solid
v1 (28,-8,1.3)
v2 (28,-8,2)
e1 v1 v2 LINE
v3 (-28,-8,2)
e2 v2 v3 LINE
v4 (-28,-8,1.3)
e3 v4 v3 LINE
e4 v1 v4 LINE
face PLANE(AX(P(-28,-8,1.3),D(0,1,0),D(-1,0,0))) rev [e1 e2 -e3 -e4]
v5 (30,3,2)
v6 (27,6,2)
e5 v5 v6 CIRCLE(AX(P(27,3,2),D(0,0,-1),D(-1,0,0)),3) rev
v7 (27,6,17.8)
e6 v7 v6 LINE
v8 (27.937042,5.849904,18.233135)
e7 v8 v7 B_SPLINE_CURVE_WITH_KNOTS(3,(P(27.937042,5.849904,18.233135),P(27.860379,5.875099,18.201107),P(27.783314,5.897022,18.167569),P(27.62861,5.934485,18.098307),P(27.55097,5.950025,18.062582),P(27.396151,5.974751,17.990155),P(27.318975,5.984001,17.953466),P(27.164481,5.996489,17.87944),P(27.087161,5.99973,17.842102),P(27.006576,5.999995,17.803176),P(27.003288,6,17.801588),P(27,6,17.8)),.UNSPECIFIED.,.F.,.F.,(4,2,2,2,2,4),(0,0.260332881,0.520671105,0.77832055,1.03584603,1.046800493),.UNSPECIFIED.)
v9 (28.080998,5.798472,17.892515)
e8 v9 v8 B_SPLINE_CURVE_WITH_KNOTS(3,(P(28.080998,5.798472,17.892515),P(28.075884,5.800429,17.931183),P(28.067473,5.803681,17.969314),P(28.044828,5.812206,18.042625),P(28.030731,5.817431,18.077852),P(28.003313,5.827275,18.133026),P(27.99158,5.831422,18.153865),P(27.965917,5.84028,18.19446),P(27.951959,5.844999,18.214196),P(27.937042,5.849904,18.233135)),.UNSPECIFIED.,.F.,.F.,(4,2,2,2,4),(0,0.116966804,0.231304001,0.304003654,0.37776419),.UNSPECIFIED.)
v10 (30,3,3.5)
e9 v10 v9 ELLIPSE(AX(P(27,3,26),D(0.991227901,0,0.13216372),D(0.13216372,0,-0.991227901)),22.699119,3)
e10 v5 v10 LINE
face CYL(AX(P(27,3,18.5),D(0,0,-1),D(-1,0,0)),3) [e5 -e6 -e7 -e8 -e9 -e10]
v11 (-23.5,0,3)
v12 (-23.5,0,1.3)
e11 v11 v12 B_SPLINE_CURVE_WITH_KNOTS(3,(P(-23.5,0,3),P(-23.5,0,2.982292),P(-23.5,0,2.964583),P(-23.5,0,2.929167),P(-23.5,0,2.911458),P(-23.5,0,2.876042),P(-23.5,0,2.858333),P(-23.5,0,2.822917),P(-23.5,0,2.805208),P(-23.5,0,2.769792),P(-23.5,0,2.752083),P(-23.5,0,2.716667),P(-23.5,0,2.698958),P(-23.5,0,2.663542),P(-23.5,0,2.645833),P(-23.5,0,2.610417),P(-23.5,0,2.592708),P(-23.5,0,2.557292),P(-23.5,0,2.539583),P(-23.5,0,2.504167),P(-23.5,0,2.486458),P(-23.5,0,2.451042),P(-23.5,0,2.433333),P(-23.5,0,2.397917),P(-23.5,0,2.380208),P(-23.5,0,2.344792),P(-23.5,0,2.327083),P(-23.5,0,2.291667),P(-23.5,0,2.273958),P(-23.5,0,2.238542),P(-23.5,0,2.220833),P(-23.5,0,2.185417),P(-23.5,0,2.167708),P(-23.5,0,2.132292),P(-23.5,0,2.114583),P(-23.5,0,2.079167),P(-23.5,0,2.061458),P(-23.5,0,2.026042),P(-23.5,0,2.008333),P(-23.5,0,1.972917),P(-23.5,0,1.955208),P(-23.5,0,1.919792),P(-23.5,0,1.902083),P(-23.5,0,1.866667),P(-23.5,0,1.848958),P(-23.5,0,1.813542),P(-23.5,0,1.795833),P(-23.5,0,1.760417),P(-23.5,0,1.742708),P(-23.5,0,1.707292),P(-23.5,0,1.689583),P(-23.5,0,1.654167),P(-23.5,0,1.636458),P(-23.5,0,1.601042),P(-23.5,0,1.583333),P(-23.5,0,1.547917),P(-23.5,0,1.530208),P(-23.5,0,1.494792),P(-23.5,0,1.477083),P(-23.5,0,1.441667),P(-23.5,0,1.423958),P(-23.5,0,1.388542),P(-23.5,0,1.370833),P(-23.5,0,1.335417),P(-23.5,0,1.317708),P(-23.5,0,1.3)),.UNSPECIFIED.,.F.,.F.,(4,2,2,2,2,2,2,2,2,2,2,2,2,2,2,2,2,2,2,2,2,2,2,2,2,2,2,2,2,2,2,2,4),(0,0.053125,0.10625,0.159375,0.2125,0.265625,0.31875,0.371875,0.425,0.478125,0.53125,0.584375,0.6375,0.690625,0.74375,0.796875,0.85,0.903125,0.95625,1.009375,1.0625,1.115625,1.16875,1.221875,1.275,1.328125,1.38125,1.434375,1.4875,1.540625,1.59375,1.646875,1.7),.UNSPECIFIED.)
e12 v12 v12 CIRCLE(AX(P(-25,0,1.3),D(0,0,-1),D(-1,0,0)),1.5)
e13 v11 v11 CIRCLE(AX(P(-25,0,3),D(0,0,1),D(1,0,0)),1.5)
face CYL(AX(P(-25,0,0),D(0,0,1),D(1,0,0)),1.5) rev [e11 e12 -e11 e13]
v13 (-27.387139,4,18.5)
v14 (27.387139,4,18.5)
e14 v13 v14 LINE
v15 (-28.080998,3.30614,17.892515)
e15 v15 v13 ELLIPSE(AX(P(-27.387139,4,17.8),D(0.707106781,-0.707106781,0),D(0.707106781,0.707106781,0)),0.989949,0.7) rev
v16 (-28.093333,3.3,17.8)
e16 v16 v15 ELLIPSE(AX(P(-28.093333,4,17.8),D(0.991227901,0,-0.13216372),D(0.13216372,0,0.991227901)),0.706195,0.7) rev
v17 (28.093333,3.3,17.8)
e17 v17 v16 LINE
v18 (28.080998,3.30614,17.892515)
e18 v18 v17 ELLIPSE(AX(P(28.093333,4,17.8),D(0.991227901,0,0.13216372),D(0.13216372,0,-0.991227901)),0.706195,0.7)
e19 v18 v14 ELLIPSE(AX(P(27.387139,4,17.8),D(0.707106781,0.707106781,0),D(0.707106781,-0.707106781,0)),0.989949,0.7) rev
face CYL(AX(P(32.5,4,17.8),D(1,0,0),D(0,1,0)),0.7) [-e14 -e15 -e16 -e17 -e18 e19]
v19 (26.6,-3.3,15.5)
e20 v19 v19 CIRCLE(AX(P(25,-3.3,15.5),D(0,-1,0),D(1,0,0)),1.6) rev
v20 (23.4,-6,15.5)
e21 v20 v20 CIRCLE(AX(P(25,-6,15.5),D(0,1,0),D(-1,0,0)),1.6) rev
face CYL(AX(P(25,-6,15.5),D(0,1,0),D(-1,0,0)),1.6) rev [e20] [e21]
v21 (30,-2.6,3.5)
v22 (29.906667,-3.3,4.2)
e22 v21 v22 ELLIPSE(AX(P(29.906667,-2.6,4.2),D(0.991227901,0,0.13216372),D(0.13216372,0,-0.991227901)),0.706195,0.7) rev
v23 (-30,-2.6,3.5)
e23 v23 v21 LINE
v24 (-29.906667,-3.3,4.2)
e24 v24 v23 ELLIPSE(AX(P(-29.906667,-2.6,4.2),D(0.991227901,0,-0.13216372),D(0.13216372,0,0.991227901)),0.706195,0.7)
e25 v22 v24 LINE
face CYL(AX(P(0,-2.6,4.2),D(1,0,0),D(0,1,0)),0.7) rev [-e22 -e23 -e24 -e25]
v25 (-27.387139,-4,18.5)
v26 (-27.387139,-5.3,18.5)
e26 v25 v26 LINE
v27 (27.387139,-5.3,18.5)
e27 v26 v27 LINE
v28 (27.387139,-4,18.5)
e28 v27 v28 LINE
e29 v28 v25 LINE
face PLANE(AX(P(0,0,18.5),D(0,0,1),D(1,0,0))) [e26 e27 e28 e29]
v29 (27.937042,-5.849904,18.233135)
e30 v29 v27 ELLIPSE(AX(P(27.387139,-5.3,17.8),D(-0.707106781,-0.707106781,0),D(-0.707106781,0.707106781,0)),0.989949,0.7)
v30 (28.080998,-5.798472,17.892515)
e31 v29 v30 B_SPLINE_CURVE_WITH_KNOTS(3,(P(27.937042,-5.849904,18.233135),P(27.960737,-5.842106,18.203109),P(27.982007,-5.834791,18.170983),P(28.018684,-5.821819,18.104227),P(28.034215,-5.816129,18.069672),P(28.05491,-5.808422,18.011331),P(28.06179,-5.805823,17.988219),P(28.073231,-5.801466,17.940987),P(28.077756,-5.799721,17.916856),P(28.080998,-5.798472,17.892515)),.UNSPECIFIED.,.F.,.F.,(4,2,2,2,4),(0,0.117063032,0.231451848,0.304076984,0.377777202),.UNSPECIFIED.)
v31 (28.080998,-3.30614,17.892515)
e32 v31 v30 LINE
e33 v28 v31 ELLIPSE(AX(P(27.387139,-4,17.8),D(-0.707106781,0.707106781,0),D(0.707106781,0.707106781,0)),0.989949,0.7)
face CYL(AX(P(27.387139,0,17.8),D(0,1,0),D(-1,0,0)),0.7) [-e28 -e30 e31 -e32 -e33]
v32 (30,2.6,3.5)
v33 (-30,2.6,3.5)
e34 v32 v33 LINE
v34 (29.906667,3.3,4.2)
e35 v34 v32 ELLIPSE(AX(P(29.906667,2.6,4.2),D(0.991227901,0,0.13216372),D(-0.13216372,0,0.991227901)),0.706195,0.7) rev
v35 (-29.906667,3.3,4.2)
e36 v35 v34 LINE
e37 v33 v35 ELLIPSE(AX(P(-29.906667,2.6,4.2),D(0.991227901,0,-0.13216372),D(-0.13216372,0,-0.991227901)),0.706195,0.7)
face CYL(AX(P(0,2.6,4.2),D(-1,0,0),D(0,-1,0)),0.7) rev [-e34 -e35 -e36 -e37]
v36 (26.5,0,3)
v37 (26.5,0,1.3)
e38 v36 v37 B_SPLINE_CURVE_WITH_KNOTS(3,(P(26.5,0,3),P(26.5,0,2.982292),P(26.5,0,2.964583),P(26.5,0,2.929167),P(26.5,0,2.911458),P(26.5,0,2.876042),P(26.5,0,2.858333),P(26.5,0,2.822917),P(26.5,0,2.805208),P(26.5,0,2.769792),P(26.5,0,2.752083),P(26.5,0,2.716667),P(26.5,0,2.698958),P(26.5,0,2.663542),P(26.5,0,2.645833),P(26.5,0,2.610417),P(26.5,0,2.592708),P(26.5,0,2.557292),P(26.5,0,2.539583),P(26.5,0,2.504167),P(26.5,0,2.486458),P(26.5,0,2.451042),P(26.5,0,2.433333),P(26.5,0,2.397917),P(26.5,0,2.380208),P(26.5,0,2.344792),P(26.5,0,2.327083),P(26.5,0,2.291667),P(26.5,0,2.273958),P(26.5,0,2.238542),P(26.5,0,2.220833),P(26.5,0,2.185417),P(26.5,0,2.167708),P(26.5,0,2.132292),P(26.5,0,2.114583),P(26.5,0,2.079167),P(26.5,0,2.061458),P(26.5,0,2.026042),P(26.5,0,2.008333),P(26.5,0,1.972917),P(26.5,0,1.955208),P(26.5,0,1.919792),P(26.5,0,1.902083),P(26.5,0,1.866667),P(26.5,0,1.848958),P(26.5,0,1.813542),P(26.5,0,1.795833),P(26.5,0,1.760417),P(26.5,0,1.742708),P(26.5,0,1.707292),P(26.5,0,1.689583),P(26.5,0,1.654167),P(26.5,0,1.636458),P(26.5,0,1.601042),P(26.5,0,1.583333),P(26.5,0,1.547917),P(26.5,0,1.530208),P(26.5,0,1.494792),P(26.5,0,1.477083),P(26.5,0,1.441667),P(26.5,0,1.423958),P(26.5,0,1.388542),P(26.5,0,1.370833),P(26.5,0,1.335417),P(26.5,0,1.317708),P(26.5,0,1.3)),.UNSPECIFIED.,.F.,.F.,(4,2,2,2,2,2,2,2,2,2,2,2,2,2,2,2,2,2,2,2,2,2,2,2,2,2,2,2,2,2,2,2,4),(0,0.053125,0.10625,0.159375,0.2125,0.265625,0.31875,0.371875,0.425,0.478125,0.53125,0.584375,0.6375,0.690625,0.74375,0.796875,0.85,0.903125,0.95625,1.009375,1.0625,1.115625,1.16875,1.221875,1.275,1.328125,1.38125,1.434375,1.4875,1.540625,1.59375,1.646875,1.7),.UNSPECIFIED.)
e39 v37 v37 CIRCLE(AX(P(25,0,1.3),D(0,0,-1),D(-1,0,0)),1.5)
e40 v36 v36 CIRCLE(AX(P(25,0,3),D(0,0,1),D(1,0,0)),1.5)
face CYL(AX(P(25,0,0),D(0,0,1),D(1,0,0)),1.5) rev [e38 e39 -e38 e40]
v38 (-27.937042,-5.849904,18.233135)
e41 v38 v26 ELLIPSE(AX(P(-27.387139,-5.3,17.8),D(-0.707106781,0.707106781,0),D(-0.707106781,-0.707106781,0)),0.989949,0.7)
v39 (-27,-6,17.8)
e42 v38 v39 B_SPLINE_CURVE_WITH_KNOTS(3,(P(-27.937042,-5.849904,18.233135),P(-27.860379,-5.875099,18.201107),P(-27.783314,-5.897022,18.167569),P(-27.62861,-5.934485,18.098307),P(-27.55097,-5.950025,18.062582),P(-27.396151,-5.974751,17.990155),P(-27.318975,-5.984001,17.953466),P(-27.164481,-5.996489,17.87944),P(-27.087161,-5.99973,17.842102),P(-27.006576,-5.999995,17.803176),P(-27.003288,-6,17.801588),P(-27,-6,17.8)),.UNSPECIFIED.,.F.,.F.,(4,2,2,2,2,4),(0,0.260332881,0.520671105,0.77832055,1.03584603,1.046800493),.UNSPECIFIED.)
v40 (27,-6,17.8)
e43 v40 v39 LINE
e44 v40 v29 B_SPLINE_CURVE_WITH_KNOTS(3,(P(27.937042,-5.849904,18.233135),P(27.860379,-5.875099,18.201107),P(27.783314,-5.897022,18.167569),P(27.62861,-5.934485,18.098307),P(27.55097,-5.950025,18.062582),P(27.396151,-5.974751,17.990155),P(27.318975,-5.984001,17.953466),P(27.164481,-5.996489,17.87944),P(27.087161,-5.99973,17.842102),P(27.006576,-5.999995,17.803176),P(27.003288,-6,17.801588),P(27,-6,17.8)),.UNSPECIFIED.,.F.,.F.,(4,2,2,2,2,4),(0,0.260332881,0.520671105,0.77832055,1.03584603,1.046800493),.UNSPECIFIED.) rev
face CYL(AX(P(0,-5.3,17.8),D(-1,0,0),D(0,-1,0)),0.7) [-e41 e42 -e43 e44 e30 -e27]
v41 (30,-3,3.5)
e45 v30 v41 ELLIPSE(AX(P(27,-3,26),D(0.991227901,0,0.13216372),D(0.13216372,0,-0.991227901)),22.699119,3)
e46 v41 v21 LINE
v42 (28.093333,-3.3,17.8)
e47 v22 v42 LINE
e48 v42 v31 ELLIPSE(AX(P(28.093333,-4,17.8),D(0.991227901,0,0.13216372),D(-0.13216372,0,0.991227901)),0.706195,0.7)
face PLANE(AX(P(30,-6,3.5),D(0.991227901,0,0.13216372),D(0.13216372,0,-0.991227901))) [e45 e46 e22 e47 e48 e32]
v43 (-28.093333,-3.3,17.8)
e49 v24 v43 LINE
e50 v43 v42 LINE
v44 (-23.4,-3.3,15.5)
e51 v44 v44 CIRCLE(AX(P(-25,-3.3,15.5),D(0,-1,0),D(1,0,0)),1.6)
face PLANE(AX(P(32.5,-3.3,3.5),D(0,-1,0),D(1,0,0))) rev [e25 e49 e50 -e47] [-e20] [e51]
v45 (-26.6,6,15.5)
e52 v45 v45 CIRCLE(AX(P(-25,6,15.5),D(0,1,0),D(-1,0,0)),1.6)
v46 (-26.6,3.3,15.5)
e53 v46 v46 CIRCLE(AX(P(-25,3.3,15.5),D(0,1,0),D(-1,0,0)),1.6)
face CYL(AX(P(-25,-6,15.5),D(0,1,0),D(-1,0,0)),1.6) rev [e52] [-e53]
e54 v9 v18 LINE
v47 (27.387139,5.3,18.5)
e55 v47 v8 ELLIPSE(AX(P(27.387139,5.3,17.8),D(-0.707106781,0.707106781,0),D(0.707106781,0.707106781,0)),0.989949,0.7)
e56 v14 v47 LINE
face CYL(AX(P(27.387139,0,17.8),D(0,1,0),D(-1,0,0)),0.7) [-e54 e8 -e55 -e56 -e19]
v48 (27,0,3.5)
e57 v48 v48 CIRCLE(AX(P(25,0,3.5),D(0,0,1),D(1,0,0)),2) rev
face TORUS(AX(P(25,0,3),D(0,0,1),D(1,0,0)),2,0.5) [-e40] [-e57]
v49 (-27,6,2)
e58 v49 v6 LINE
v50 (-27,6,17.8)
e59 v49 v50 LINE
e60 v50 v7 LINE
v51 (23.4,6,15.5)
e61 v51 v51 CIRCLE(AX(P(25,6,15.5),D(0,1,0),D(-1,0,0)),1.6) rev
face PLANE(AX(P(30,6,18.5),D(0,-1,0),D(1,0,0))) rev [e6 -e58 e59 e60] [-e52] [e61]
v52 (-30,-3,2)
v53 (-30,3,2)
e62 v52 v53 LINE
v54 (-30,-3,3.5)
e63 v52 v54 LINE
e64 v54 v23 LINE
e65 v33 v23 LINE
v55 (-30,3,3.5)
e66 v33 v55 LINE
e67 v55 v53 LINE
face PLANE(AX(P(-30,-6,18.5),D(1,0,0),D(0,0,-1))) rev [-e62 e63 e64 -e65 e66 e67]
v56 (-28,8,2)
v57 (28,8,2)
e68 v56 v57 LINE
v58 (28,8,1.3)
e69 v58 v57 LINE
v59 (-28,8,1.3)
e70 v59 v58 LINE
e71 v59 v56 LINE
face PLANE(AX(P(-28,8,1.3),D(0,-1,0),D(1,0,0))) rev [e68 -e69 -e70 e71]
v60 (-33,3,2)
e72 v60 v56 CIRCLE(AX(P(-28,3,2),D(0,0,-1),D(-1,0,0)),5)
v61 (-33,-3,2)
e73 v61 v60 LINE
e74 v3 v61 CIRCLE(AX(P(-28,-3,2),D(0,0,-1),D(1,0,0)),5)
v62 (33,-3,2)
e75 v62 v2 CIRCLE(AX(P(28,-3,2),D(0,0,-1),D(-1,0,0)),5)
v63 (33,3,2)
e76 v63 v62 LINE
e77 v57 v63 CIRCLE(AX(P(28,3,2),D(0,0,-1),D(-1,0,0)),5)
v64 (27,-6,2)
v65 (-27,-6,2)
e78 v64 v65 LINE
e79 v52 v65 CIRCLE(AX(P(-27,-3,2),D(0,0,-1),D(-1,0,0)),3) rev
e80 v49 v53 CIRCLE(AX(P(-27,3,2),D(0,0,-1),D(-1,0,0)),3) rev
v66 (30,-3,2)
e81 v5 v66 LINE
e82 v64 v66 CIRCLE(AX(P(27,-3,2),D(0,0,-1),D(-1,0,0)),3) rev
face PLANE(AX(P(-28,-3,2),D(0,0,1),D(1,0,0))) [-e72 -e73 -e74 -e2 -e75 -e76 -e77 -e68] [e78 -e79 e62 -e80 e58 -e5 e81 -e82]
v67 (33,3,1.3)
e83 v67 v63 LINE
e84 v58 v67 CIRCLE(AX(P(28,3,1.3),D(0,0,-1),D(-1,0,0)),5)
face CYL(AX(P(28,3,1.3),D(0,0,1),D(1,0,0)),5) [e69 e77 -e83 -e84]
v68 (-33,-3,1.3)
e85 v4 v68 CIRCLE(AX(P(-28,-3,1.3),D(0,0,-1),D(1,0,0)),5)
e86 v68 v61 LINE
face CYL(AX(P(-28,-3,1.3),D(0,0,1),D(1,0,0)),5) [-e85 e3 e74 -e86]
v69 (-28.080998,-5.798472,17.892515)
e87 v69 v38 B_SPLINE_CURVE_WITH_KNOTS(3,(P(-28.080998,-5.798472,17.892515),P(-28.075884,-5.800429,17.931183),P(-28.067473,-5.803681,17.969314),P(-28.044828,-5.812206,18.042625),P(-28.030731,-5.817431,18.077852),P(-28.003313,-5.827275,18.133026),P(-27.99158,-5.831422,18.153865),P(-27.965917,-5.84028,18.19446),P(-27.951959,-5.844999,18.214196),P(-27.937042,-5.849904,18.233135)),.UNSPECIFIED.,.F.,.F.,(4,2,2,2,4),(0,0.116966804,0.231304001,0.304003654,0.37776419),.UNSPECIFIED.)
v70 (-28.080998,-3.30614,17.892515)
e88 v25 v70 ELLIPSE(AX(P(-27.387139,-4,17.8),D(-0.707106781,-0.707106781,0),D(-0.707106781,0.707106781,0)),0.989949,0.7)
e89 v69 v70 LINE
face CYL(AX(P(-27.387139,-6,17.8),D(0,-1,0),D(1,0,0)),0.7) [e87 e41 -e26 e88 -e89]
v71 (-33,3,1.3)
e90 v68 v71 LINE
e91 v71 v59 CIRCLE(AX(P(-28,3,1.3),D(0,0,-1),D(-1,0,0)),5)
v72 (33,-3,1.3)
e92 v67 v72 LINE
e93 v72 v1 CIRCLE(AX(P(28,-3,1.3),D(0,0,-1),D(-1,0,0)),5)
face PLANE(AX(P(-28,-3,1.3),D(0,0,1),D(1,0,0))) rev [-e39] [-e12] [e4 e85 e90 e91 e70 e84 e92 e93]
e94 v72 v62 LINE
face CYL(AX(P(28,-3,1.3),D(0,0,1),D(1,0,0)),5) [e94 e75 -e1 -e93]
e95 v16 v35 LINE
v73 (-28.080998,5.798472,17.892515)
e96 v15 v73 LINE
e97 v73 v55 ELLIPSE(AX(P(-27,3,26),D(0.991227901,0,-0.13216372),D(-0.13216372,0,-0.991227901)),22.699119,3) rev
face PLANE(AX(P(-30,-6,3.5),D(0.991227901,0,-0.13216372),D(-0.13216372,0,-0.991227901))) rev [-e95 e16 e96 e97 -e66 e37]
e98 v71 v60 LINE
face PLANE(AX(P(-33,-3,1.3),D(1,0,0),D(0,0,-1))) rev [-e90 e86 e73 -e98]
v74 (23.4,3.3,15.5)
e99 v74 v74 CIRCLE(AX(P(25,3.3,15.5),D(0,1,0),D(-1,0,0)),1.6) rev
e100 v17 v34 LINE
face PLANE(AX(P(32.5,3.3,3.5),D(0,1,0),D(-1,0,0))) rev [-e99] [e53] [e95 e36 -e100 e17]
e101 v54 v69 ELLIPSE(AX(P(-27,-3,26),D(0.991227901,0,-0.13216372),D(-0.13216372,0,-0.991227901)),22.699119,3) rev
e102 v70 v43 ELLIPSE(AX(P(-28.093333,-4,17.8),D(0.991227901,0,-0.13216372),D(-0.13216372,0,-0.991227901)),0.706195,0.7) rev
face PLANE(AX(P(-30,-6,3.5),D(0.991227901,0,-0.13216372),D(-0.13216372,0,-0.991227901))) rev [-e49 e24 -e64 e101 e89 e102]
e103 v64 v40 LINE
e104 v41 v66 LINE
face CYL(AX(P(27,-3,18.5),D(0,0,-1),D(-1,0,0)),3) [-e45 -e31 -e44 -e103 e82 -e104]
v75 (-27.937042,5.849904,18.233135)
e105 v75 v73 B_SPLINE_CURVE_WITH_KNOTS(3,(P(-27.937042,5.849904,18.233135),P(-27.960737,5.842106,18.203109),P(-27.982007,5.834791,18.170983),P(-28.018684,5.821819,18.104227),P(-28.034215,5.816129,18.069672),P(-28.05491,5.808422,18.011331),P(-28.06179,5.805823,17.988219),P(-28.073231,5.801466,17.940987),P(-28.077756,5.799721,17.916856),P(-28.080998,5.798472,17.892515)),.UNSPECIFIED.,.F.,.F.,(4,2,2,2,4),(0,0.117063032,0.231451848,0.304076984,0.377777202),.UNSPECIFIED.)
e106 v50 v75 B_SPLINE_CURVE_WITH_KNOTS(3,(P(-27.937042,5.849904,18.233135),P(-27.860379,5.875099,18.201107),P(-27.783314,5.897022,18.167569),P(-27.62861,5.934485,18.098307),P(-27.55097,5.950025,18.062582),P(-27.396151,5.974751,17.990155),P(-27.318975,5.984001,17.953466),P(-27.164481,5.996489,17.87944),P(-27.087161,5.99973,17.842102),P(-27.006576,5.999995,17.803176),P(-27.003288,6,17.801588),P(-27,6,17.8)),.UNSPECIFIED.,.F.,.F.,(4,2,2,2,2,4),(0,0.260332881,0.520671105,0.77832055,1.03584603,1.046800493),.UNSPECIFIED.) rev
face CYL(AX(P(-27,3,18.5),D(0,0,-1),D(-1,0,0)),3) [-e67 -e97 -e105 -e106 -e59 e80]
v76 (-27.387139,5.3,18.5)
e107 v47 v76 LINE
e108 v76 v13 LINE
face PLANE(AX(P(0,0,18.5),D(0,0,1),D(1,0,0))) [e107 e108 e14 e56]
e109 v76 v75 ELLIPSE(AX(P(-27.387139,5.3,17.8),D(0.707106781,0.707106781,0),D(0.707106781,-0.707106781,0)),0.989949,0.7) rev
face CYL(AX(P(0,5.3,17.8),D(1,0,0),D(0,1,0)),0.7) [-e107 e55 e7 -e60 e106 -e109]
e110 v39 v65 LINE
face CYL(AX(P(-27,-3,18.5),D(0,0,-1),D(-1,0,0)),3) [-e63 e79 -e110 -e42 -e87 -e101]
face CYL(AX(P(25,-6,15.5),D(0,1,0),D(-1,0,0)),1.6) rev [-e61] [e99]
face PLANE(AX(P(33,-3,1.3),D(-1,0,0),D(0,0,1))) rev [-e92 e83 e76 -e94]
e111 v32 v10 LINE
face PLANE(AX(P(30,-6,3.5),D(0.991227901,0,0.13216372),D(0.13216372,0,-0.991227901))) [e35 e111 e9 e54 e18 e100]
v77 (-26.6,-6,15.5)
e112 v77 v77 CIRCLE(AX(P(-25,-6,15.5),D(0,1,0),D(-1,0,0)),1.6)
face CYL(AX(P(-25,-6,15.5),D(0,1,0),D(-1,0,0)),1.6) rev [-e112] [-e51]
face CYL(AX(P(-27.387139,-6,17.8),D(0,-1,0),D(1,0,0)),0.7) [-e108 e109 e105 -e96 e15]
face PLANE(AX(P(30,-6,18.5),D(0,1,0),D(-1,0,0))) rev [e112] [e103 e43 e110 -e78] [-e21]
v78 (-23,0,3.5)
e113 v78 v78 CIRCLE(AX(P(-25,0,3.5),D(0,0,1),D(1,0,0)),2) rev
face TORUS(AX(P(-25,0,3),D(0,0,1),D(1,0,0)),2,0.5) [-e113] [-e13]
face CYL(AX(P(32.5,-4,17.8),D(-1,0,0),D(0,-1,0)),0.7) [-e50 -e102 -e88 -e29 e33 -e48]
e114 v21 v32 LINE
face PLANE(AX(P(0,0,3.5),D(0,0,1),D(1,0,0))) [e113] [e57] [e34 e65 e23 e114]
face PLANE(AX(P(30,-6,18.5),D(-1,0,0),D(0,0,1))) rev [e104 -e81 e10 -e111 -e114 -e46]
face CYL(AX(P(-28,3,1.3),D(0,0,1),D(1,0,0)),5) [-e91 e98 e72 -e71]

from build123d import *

# Parameters (mm, degrees)
SKETCH1_W           = 60
SKETCH1_H           = 12
BOSS_EXTRUDE1_DEPTH = 18.5
SKETCH2_W           = 65
SKETCH2_H           = 6.6
CUT_EXTRUDE1_DEPTH  = 15
SKETCH3_R           = 1.6
CUT_EXTRUDE2_DEPTH  = 38.232378382
CUT_EXTRUDE3_DEPTH  = 37.451886097
FILLET1_R           = 0.7
FILLET3_R           = 0.7
FILLET4_R           = 3
SKETCH5_R           = 1.5
CUT_EXTRUDE4_DEPTH  = 35.073450224
FILLET5_R           = 0.5
SKETCH6_W           = 73.746826028
SKETCH6_H           = 28.597179554
CUT_EXTRUDE5_DEPTH  = 2
SKETCH8_R           = 1.5
BOSS_EXTRUDE2_DEPTH = 0.7


with BuildPart() as part:
    # Sketch1 → Boss-Extrude1 (new body)
    with BuildSketch(Plane.XY):
        Rectangle(SKETCH1_W, SKETCH1_H)
    extrude(amount=BOSS_EXTRUDE1_DEPTH)

    # Sketch2 → Cut-Extrude1 (cut)
    with BuildSketch(Plane.XY.offset(18.5)):
        Rectangle(SKETCH2_W, SKETCH2_H)
    extrude(amount=-CUT_EXTRUDE1_DEPTH, mode=Mode.SUBTRACT)

    # Sketch3 → Cut-Extrude2 (cut, through all)
    with BuildSketch(Plane(origin=(0, 6, 0), x_dir=(1, 0, 0), z_dir=(0, 1, 0))):
        with Locations(Location((25, -15.5, 0), (0, 0, 180))):
            Circle(SKETCH3_R)
        with Locations(Location((-25, -15.5, 0), (0, 0, 180))):
            Circle(SKETCH3_R)
    extrude(amount=-CUT_EXTRUDE2_DEPTH, mode=Mode.SUBTRACT)

    # Sketch4 → Cut-Extrude3 (cut, symmetric)
    with BuildSketch(Plane(origin=(0, -3.3, 0), x_dir=(1, 0, 0), z_dir=(0, 1, 0))):
        Polygon((-30, -3.5), (-28, -18.5), (-30, -18.5), align=None)
    cut_extrude3 = extrude(amount=CUT_EXTRUDE3_DEPTH, both=True, mode=Mode.SUBTRACT)

    # Mirror1: Cut-Extrude3 across plane
    add(cut_extrude3.mirror(Plane(origin=(0, 0, 0), x_dir=(0, 0, 1), z_dir=(1, 0, 0))), mode=Mode.SUBTRACT)

    # Fillet1
    fillet1_edges = [part.edges().sort_by_distance(p)[0] for p in [
        (0, 3.3, 3.5),
        (0, -3.3, 3.5),
    ]]
    fillet(fillet1_edges, radius=FILLET1_R)

    # Fillet3
    fillet3_edges = [part.edges().sort_by_distance(p)[0] for p in [
        (0, -3.3, 18.5),
        (0, -6, 18.5),
        (-28, 4.65, 18.5),
        (-28, -4.65, 18.5),
        (0, 3.3, 18.5),
        (0, 6, 18.5),
        (28, 4.65, 18.5),
        (28, -4.65, 18.5),
    ]]
    fillet(fillet3_edges, radius=FILLET3_R)

    # Fillet4
    # the kernel refuses this fillet: 3 mm, written as the material it takes off along each edge
    with BuildSketch(Plane(origin=(30, -6, -18), x_dir=(-1, 0, 0), z_dir=(0, 0, 1)), Plane(origin=(-30, -6, -18), x_dir=(0, 1, 0), z_dir=(0, 0, 1))) as fillet4_piece_1:
        with BuildLine():
            CenterArc((FILLET4_R, -FILLET4_R), FILLET4_R, 90, 90)
            Line((0, -FILLET4_R), (-FILLET4_R * 0.02, -FILLET4_R))
            Line((-FILLET4_R * 0.02, -FILLET4_R), (-FILLET4_R * 0.02, FILLET4_R * 0.02))
            Line((-FILLET4_R * 0.02, FILLET4_R * 0.02), (FILLET4_R, FILLET4_R * 0.02))
            Line((FILLET4_R, FILLET4_R * 0.02), (FILLET4_R, 0))
        make_face()
    extrude(amount=39.5, mode=Mode.SUBTRACT)
    with BuildSketch(Plane(origin=(30, 6, -18), x_dir=(-1, 0, 0), z_dir=(0, 0, 1)), Plane(origin=(-30, 6, -18), x_dir=(0, -1, 0), z_dir=(0, 0, 1))) as fillet4_piece_2:
        with BuildLine():
            CenterArc((FILLET4_R, FILLET4_R), FILLET4_R, 180, 90)
            Line((0, FILLET4_R), (-FILLET4_R * 0.02, FILLET4_R))
            Line((-FILLET4_R * 0.02, FILLET4_R), (-FILLET4_R * 0.02, -FILLET4_R * 0.02))
            Line((-FILLET4_R * 0.02, -FILLET4_R * 0.02), (FILLET4_R, -FILLET4_R * 0.02))
            Line((FILLET4_R, -FILLET4_R * 0.02), (FILLET4_R, 0))
        make_face()
    extrude(amount=39.5, mode=Mode.SUBTRACT)

    # Sketch5 → Cut-Extrude4 (cut, through all)
    with BuildSketch(Plane.XY.offset(3.5)):
        with Locations((-25, 0)):
            Circle(SKETCH5_R)
        with Locations((25, 0)):
            Circle(SKETCH5_R)
    extrude(amount=-CUT_EXTRUDE4_DEPTH, mode=Mode.SUBTRACT)

    # Fillet5
    fillet5_edges = [part.edges().sort_by_distance(p)[0] for p in [
        (-26.5, 0, 3.5),
        (23.5, 0, 3.5),
    ]]
    fillet(fillet5_edges, radius=FILLET5_R)

    # Sketch6 → Cut-Extrude5 (cut)
    with BuildSketch(Plane.XY):
        Rectangle(SKETCH6_W, SKETCH6_H)
    extrude(amount=CUT_EXTRUDE5_DEPTH, mode=Mode.SUBTRACT)

    # Sketch8 → Boss-Extrude2 (add)
    with BuildSketch(Plane(origin=(0, 0, 2), x_dir=(-1, 0, 0), z_dir=(0, 0, -1))):
        with BuildLine():
            Line((28, -8), (-28, -8))
            ThreePointArc((-28, -8), (-31.535533906, -6.535533906), (-33, -3))
            Line((-33, -3), (-33, 3))
            ThreePointArc((-33, 3), (-31.535533906, 6.535533906), (-28, 8))
            Line((-28, 8), (28, 8))
            ThreePointArc((28, 8), (31.535533906, 6.535533906), (33, 3))
            Line((33, 3), (33, -3))
            ThreePointArc((33, -3), (31.535533906, -6.535533906), (28, -8))
        make_face()
        with Locations(Location((-25, 0, 0), (0, 0, 180))):
            Circle(SKETCH8_R, mode=Mode.SUBTRACT)
        with Locations(Location((25, 0, 0), (0, 0, 180))):
            Circle(SKETCH8_R, mode=Mode.SUBTRACT)
    extrude(amount=BOSS_EXTRUDE2_DEPTH)


solid = part.part
